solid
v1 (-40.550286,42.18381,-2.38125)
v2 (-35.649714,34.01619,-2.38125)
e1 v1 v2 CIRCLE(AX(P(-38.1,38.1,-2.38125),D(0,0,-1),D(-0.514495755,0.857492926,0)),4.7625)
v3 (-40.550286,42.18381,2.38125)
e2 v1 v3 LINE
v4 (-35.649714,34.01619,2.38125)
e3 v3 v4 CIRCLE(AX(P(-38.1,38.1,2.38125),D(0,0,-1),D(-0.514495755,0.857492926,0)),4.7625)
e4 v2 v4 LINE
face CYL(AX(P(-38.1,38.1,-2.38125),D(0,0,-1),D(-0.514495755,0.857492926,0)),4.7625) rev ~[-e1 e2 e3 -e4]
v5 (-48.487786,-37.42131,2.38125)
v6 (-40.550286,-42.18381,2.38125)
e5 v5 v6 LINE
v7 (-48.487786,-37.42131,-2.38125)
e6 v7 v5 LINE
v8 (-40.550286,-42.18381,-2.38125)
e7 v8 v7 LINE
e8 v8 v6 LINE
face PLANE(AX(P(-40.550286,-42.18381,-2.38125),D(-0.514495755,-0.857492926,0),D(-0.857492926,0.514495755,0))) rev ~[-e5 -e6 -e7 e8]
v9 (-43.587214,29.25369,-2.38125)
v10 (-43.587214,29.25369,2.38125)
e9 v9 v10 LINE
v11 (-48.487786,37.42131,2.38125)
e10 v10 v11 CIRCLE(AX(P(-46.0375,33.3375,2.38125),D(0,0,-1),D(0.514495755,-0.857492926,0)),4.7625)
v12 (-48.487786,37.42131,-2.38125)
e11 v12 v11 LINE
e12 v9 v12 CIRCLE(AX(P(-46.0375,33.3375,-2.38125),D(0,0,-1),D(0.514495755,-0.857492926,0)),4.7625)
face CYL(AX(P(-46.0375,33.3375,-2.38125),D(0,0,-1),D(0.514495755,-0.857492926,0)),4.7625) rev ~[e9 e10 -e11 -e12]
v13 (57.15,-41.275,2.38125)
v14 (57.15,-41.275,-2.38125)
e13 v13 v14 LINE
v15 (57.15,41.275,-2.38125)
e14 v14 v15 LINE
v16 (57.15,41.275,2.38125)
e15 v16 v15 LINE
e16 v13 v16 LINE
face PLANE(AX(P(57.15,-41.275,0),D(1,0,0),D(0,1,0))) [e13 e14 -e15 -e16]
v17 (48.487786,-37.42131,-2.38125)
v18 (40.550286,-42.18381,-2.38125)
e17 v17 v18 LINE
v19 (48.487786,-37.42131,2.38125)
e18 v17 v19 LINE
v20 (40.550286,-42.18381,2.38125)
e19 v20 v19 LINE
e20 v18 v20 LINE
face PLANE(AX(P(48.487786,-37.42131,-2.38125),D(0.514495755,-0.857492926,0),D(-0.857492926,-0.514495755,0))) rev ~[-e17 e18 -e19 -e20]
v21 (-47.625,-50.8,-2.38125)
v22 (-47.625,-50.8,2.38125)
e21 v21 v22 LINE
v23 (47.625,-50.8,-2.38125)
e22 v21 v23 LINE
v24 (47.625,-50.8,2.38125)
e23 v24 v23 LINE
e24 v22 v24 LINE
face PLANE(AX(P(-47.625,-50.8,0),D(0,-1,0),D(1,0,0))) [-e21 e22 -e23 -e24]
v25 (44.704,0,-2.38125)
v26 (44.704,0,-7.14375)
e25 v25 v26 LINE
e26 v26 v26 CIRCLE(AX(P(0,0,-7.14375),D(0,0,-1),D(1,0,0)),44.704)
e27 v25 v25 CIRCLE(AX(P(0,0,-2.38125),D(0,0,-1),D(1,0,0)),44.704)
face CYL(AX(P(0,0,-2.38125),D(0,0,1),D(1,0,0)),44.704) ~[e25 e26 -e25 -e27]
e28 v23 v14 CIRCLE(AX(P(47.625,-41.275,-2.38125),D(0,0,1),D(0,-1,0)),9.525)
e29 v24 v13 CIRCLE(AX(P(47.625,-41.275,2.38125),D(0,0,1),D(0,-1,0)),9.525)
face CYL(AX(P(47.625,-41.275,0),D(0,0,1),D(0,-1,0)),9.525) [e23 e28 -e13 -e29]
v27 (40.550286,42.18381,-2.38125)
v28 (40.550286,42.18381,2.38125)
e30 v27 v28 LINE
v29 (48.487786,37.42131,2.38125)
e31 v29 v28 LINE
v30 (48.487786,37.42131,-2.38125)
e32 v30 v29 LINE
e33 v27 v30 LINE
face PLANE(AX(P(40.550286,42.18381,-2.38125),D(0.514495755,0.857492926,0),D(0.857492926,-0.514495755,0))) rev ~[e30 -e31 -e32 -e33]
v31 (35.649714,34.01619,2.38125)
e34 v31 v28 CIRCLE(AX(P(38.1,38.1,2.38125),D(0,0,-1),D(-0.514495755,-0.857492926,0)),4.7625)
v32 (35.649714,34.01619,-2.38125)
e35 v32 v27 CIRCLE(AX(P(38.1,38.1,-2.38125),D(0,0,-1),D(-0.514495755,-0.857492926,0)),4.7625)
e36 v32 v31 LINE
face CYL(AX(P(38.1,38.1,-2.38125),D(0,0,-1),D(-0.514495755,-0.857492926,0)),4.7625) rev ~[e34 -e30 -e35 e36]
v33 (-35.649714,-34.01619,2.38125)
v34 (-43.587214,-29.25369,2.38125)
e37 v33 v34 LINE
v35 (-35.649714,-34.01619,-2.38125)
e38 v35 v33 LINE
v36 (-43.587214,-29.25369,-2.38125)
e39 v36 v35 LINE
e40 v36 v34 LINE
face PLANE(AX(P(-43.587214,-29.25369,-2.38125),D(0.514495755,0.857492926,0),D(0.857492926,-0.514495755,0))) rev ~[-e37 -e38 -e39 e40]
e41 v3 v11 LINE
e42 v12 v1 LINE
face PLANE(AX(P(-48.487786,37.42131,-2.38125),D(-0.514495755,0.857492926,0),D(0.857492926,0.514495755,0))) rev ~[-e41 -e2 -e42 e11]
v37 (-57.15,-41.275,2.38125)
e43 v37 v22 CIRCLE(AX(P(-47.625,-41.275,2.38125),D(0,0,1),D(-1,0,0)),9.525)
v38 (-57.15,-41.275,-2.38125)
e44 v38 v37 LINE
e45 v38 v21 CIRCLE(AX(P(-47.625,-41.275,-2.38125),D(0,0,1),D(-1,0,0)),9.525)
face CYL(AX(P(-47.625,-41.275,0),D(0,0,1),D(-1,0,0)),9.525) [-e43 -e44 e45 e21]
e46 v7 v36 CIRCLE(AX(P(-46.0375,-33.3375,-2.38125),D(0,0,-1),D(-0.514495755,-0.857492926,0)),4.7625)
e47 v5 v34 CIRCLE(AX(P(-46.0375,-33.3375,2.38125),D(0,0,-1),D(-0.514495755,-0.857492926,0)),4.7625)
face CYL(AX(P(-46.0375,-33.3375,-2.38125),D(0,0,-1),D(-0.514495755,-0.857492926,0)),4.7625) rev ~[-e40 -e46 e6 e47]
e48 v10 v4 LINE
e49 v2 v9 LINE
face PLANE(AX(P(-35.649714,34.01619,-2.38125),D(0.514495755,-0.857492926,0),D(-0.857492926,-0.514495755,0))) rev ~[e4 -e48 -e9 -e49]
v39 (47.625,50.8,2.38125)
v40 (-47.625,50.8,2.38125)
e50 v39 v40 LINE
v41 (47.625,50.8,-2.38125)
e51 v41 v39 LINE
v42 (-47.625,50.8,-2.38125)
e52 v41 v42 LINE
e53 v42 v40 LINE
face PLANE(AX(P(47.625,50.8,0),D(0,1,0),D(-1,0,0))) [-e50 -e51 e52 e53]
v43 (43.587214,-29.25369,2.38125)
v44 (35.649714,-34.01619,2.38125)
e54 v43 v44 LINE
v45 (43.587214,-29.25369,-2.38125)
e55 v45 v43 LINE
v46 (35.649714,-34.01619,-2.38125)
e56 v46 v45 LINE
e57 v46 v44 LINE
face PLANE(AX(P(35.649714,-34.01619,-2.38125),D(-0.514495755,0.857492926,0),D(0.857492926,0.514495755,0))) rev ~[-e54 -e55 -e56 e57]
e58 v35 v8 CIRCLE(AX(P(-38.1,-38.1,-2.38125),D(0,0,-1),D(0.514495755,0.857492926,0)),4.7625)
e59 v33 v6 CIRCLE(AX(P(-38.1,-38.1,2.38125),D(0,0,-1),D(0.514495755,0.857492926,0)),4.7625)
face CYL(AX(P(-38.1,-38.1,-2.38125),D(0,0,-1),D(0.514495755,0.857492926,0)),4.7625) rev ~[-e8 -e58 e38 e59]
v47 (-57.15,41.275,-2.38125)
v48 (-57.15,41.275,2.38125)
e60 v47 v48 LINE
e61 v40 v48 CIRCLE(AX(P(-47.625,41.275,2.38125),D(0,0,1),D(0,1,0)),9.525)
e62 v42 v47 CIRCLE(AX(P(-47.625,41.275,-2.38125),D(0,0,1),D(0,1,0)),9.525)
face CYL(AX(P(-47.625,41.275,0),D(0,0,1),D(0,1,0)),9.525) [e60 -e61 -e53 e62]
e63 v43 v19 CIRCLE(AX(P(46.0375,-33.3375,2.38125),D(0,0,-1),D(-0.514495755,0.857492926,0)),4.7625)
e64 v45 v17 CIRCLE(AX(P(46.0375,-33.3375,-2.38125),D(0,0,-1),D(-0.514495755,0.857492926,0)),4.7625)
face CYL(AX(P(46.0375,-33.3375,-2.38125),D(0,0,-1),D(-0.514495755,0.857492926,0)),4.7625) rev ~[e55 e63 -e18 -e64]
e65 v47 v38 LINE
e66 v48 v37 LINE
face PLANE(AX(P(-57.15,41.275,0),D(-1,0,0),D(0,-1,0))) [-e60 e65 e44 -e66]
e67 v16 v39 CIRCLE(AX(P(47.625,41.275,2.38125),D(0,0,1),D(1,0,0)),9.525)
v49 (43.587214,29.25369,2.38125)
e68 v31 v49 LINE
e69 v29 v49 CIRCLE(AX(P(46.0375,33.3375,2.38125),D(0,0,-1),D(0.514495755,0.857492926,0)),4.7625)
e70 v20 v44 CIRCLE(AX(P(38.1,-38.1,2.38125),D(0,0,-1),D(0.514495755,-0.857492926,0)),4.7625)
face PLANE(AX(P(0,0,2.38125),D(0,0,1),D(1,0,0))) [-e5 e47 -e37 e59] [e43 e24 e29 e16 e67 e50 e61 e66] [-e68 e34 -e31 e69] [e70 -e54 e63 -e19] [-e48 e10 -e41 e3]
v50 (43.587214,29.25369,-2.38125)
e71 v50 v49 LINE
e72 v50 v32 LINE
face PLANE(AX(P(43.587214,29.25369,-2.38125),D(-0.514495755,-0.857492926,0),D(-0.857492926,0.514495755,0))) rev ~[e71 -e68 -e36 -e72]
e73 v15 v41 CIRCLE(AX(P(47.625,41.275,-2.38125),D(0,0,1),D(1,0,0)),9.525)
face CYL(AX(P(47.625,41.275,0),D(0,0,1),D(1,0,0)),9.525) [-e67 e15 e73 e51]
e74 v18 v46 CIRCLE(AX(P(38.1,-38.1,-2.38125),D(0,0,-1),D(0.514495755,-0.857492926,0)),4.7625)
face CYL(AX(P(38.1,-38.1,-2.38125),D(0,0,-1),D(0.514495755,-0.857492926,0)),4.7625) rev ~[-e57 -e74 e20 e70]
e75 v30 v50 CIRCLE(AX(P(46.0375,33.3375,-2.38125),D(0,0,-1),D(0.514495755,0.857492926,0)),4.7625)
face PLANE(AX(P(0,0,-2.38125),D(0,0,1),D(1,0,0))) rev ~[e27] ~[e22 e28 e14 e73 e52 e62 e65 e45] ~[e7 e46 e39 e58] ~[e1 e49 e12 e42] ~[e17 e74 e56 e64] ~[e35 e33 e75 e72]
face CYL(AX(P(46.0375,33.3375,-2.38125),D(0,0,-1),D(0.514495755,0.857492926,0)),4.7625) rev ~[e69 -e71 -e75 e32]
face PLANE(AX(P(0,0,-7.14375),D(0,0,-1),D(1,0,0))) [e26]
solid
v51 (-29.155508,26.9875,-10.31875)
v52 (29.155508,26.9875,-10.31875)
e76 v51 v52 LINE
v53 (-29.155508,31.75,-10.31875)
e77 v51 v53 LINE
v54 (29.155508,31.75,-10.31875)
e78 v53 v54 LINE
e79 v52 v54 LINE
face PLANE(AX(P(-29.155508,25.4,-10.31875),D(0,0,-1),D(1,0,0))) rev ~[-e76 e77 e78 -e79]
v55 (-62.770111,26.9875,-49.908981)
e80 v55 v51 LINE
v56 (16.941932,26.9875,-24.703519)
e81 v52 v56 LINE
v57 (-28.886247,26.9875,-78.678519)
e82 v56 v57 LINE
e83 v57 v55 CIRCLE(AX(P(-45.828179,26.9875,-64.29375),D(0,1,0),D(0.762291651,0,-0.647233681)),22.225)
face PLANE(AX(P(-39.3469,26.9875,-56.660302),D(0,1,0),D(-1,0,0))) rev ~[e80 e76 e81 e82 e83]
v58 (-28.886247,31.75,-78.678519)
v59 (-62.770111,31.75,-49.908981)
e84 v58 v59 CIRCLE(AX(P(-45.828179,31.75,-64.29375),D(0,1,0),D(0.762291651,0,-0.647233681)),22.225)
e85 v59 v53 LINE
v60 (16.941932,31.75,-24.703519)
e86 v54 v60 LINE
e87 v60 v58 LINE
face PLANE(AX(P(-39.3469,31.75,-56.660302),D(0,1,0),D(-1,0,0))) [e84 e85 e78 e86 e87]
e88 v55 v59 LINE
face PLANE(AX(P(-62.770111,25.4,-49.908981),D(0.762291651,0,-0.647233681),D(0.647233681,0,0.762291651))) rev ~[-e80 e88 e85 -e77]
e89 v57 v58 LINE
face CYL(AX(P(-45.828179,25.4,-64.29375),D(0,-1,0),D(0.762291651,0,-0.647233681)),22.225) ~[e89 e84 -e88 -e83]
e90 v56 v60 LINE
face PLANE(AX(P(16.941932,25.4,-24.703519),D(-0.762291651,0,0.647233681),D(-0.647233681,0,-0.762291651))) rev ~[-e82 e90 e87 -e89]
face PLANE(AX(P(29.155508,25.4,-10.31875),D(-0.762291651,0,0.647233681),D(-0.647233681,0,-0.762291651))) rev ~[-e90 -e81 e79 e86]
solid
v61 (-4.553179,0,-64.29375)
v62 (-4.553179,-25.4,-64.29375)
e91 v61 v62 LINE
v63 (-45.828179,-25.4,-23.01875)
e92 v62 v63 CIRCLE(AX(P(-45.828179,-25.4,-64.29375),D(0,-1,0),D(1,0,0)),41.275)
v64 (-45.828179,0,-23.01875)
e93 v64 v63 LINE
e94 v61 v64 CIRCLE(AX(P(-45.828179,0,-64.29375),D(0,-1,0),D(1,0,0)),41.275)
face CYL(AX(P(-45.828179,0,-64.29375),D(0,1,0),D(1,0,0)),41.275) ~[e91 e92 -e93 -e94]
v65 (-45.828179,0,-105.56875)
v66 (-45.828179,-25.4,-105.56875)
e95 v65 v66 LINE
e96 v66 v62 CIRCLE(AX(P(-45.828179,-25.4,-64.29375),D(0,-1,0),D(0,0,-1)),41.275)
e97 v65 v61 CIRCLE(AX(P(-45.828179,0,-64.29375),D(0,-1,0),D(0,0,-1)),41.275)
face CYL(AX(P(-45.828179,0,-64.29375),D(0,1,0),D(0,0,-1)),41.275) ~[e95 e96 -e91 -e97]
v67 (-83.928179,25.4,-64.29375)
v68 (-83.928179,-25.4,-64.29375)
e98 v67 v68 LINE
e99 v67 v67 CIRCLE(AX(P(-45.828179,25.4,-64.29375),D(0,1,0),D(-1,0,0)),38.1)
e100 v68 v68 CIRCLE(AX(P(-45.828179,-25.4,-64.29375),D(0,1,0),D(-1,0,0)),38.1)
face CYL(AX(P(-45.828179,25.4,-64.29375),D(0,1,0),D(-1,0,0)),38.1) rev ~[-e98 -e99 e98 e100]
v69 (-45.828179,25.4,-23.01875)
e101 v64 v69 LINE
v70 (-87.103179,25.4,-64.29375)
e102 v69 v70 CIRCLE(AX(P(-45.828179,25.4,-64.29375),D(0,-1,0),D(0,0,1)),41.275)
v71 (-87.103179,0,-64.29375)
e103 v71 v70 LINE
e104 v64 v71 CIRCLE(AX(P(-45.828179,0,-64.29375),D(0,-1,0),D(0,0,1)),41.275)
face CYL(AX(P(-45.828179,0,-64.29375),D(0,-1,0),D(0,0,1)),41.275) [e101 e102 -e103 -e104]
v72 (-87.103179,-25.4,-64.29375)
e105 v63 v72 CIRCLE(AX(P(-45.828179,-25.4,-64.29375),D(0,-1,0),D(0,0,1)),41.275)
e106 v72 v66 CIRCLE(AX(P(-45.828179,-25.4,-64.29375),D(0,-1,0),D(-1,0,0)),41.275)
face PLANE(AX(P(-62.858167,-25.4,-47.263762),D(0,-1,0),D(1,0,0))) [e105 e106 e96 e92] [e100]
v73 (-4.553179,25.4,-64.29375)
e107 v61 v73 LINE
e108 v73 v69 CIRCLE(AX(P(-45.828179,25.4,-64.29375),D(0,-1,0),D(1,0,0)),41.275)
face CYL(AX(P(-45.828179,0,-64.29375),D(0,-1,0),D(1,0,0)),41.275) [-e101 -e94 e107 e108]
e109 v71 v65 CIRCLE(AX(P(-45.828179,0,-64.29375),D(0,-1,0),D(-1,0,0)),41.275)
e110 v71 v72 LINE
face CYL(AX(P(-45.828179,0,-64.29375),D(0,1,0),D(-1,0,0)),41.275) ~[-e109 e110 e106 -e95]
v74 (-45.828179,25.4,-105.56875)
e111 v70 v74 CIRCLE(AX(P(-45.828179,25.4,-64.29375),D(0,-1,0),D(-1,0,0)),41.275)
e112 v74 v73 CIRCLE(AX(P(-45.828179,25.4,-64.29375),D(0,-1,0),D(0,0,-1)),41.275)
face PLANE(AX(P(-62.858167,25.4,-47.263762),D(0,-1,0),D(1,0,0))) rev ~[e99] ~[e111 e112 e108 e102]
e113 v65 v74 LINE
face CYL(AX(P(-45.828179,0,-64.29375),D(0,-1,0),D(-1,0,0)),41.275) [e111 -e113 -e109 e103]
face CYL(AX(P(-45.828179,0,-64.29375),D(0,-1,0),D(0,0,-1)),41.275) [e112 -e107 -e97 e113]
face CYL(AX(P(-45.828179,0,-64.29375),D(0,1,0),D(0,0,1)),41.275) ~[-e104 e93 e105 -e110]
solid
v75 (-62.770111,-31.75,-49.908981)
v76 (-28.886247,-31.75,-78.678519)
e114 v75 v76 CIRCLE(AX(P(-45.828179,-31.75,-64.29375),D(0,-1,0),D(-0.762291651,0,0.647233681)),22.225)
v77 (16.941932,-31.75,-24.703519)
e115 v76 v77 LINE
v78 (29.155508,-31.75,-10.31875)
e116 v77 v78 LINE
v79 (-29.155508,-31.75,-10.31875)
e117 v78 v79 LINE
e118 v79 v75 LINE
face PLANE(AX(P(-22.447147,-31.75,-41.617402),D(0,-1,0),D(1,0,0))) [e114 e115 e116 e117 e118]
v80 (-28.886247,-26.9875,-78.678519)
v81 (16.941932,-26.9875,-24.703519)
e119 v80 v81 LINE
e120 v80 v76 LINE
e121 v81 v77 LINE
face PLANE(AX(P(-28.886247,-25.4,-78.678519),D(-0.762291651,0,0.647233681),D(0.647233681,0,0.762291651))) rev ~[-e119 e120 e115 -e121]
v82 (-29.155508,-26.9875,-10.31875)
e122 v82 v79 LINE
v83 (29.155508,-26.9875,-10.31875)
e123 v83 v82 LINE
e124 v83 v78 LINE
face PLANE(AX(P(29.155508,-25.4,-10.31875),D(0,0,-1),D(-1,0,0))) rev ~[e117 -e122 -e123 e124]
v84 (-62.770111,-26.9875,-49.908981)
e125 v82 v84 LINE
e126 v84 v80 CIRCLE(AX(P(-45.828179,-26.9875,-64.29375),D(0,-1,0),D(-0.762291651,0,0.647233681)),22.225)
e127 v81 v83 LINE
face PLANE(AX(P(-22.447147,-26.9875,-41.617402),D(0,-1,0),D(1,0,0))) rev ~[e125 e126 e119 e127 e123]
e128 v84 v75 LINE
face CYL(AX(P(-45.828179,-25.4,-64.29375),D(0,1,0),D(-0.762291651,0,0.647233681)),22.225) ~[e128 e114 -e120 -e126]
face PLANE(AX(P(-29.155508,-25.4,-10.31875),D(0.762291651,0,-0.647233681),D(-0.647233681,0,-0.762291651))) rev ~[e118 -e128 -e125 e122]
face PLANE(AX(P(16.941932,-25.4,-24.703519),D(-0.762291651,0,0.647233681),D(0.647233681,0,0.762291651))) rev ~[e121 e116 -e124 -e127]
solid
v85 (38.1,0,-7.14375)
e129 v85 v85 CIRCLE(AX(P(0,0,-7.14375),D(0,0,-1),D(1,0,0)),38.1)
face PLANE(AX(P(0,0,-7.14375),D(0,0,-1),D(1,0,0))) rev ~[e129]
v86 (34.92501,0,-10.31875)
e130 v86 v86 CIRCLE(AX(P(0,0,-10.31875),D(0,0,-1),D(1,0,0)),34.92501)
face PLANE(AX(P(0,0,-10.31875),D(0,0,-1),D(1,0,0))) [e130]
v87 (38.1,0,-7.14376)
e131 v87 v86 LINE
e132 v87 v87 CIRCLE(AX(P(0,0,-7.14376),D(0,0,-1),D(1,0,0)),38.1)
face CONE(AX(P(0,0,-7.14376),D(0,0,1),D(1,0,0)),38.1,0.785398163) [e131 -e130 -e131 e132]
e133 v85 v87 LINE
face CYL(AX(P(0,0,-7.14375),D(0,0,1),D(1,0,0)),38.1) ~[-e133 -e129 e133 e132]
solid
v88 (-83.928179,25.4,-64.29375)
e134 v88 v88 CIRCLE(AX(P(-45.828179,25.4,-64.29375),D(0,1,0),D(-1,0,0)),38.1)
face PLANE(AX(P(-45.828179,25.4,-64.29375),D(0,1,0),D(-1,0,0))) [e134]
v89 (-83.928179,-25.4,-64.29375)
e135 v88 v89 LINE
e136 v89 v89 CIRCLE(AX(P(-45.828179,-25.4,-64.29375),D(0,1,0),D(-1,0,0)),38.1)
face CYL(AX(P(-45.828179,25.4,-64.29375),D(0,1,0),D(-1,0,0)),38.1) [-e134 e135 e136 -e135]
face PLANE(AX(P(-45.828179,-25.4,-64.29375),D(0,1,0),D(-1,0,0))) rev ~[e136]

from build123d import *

# Parameters (mm, degrees)
F1_DEPTH  = 2.38125
F3_DEPTH  = 25.4
F4_R      = 44.704
F5_DEPTH  = 4.7625
F6_R      = 38.1
F7_DEPTH  = 3.175
F8_SIZE   = 3.17499
F10_DEPTH = 25.4
F12_DEPTH = 6.35
F13_DEPTH = 1.5875
F14_R     = 38.1
F15_DEPTH = 50.8
F16_DEPTH = 50.8
F18_DEPTH = 6.35
F19_DEPTH = 1.5875


# Not quite as in the source:
# - a fillet or chamfer is up to 0.001 mm smaller than in the source, because OpenCascade refuses the exact size


with BuildPart() as f1:
    # F0 (on Top) → F1 (new body, symmetric)
    with BuildSketch(Plane.XY):
        with BuildLine():
            ThreePointArc((57.15, 41.275), (54.3601920908, 48.0101920908), (47.625, 50.8))
            Line((47.625, 50.8), (-47.625, 50.8))
            ThreePointArc((-47.625, 50.8), (-54.3601920908, 48.0101920908), (-57.15, 41.275))
            Line((-57.15, 41.275), (-57.15, -41.275))
            ThreePointArc((-57.15, -41.275), (-54.3601920908, -48.0101920908), (-47.625, -50.8))
            Line((-47.625, -50.8), (47.625, -50.8))
            ThreePointArc((47.625, -50.8), (54.3601920908, -48.0101920908), (57.15, -41.275))
            Line((57.15, -41.275), (57.15, 41.275))
        make_face()
    extrude(amount=F1_DEPTH, both=True)

    # F2 (on face) → F3 (cut)
    with BuildSketch(Plane(origin=(0, 0, -2.38125), x_dir=(1, 0, 0), z_dir=(0, 0, -1))):
        with BuildLine():
            Line((-40.5502860352, 42.1838100587), (-48.4877860352, 37.4213100587))
            ThreePointArc((-48.4877860352, 37.4213100587), (-50.1213100587, 30.8872139648), (-43.5872139648, 29.2536899413))
            Line((-43.5872139648, 29.2536899413), (-35.6497139648, 34.0161899413))
            ThreePointArc((-35.6497139648, 34.0161899413), (-34.0161899413, 40.5502860352), (-40.5502860352, 42.1838100587))
        make_face()
        with BuildLine():
            Line((35.6497139648, 34.0161899413), (43.5872139648, 29.2536899413))
            ThreePointArc((43.5872139648, 29.2536899413), (50.1213100587, 30.8872139648), (48.4877860352, 37.4213100587))
            Line((48.4877860352, 37.4213100587), (40.5502860352, 42.1838100587))
            ThreePointArc((40.5502860352, 42.1838100587), (34.0161899413, 40.5502860352), (35.6497139648, 34.0161899413))
        make_face()
        with BuildLine():
            Line((-48.4877860352, -37.4213100587), (-40.5502860352, -42.1838100587))
            ThreePointArc((-40.5502860352, -42.1838100587), (-34.0161899413, -40.5502860352), (-35.6497139648, -34.0161899413))
            Line((-35.6497139648, -34.0161899413), (-43.5872139648, -29.2536899413))
            ThreePointArc((-43.5872139648, -29.2536899413), (-50.1213100587, -30.8872139648), (-48.4877860352, -37.4213100587))
        make_face()
        with BuildLine():
            Line((40.5502860352, -42.1838100587), (48.4877860352, -37.4213100587))
            ThreePointArc((48.4877860352, -37.4213100587), (50.1213100587, -30.8872139648), (43.5872139648, -29.2536899413))
            Line((43.5872139648, -29.2536899413), (35.6497139648, -34.0161899413))
            ThreePointArc((35.6497139648, -34.0161899413), (34.0161899413, -40.5502860352), (40.5502860352, -42.1838100587))
        make_face()
    extrude(amount=-F3_DEPTH, mode=Mode.SUBTRACT)

    # F4 (on face) → F5 (join)
    with BuildSketch(Plane(origin=(0, 0, -2.38125), x_dir=(1, 0, 0), z_dir=(0, 0, -1))):
        Circle(F4_R)
    extrude(amount=F5_DEPTH)


with BuildPart() as f7:
    # F6 (on face) → F7 (new body)
    with BuildSketch(Plane(origin=(0, 0, -7.14375), x_dir=(1, 0, 0), z_dir=(0, 0, -1))):
        Circle(F6_R)
    extrude(amount=F7_DEPTH)

    # F8 (size 3.175 in the source; OpenCascade refuses exactly that, so slightly less here)
    f8_edges = [f7.edges().sort_by_distance(p)[0] for p in [
        (-38.1, 0, -10.31875),
    ]]
    chamfer(f8_edges, length=F8_SIZE)


with BuildPart() as f10:
    # F9 (on Front) → F10 (new body, symmetric)
    with BuildSketch(Plane.XZ):
        with BuildLine():
            ThreePointArc((-45.8281786, -23.01875), (-75.0140109935, -35.1079176065), (-87.1031786, -64.29375))
            Line((-87.1031786, -64.29375), (-45.8281786, -64.29375))
            Line((-45.8281786, -64.29375), (-45.8281786, -23.01875))
        make_face()
        with BuildLine():
            Line((-45.8281786, -64.29375), (-87.1031786, -64.29375))
            ThreePointArc((-87.1031786, -64.29375), (-75.0140109935, -93.4795823935), (-45.8281786, -105.56875))
            Line((-45.8281786, -105.56875), (-45.8281786, -64.29375))
        make_face()
        with BuildLine():
            Line((-45.8281786, -23.01875), (-45.8281786, -64.29375))
            Line((-45.8281786, -64.29375), (-4.5531786, -64.29375))
            ThreePointArc((-4.5531786, -64.29375), (-16.6423462065, -35.1079176065), (-45.8281786, -23.01875))
        make_face()
        with BuildLine():
            Line((-4.5531786, -64.29375), (-45.8281786, -64.29375))
            Line((-45.8281786, -64.29375), (-45.8281786, -105.56875))
            ThreePointArc((-45.8281786, -105.56875), (-16.6423462065, -93.4795823935), (-4.5531786, -64.29375))
        make_face()
    extrude(amount=F10_DEPTH, both=True)

    # F14 (on face) → F15 (cut, through all)
    with BuildSketch(Plane(origin=(0, 25.4, 0), x_dir=(-1, 0, 0), z_dir=(0, 1, 0))):
        with Locations((45.8281786, -64.29375)):
            Circle(F14_R)
    extrude(amount=-F15_DEPTH, mode=Mode.SUBTRACT)


with BuildPart() as f12:
    # F11 (on face) → F12 (new body)
    with BuildSketch(Plane.XZ.offset(25.4)):
        with BuildLine():
            Line((29.1555075522, -10.31875), (-29.1555075522, -10.31875))
            Line((-29.1555075522, -10.31875), (-62.7701105528, -49.9089814337))
            ThreePointArc((-62.7701105528, -49.9089814337), (-60.2129471663, -81.2356819528), (-28.8862466472, -78.6785185663))
            Line((-28.8862466472, -78.6785185663), (16.9419319528, -24.7035185663))
            Line((16.9419319528, -24.7035185663), (29.1555075522, -10.31875))
        make_face()
    extrude(amount=F12_DEPTH)

    # F13 (cut): a face of the model
    f13_faces = [f12.faces().sort_by_distance(p)[0] for p in [
        (-27.0105853212, -25.4, -44.578171556),
    ]]
    extrude(f13_faces, amount=-F13_DEPTH, mode=Mode.SUBTRACT)


with BuildPart() as f16:
    # F14 (on face) → F16 (new body)
    with BuildSketch(Plane(origin=(0, 25.4, 0), x_dir=(-1, 0, 0), z_dir=(0, 1, 0))):
        with Locations((45.8281786, -64.29375)):
            Circle(F14_R)
    extrude(amount=-F16_DEPTH)


with BuildPart() as f18:
    # F17 (on face) → F18 (new body)
    with BuildSketch(Plane(origin=(0, 25.4, 0), x_dir=(-1, 0, 0), z_dir=(0, 1, 0))):
        with BuildLine():
            Line((62.7701105528, -49.9089814337), (42.7407704224, -26.3190490697))
            ThreePointArc((42.7407704224, -26.3190490697), (21.1685753435, -35.2504380808), (8.8569065167, -55.0885862022))
            Line((8.8569065167, -55.0885862022), (28.8862466472, -78.6785185663))
            ThreePointArc((28.8862466472, -78.6785185663), (60.2129471663, -81.2356819528), (62.7701105528, -49.9089814337))
        make_face()
        with BuildLine():
            Line((29.1555075522, -10.31875), (-29.1555075522, -10.31875))
            Line((-29.1555075522, -10.31875), (-16.9419319528, -24.7035185663))
            Line((-16.9419319528, -24.7035185663), (8.8569065167, -55.0885862022))
            ThreePointArc((8.8569065167, -55.0885862022), (21.1685753435, -35.2504380808), (42.7407704224, -26.3190490697))
            Line((42.7407704224, -26.3190490697), (29.1555075522, -10.31875))
        make_face()
    extrude(amount=F18_DEPTH)

    # F19 (cut): a face of the model
    f19_faces = [f18.faces().sort_by_distance(p)[0] for p in [
        (-27.0105853212, 25.4, -44.578171556),
    ]]
    extrude(f19_faces, amount=-F19_DEPTH, mode=Mode.SUBTRACT)


solid = Compound([f1.part, f7.part, f10.part, f12.part, f16.part, f18.part])
